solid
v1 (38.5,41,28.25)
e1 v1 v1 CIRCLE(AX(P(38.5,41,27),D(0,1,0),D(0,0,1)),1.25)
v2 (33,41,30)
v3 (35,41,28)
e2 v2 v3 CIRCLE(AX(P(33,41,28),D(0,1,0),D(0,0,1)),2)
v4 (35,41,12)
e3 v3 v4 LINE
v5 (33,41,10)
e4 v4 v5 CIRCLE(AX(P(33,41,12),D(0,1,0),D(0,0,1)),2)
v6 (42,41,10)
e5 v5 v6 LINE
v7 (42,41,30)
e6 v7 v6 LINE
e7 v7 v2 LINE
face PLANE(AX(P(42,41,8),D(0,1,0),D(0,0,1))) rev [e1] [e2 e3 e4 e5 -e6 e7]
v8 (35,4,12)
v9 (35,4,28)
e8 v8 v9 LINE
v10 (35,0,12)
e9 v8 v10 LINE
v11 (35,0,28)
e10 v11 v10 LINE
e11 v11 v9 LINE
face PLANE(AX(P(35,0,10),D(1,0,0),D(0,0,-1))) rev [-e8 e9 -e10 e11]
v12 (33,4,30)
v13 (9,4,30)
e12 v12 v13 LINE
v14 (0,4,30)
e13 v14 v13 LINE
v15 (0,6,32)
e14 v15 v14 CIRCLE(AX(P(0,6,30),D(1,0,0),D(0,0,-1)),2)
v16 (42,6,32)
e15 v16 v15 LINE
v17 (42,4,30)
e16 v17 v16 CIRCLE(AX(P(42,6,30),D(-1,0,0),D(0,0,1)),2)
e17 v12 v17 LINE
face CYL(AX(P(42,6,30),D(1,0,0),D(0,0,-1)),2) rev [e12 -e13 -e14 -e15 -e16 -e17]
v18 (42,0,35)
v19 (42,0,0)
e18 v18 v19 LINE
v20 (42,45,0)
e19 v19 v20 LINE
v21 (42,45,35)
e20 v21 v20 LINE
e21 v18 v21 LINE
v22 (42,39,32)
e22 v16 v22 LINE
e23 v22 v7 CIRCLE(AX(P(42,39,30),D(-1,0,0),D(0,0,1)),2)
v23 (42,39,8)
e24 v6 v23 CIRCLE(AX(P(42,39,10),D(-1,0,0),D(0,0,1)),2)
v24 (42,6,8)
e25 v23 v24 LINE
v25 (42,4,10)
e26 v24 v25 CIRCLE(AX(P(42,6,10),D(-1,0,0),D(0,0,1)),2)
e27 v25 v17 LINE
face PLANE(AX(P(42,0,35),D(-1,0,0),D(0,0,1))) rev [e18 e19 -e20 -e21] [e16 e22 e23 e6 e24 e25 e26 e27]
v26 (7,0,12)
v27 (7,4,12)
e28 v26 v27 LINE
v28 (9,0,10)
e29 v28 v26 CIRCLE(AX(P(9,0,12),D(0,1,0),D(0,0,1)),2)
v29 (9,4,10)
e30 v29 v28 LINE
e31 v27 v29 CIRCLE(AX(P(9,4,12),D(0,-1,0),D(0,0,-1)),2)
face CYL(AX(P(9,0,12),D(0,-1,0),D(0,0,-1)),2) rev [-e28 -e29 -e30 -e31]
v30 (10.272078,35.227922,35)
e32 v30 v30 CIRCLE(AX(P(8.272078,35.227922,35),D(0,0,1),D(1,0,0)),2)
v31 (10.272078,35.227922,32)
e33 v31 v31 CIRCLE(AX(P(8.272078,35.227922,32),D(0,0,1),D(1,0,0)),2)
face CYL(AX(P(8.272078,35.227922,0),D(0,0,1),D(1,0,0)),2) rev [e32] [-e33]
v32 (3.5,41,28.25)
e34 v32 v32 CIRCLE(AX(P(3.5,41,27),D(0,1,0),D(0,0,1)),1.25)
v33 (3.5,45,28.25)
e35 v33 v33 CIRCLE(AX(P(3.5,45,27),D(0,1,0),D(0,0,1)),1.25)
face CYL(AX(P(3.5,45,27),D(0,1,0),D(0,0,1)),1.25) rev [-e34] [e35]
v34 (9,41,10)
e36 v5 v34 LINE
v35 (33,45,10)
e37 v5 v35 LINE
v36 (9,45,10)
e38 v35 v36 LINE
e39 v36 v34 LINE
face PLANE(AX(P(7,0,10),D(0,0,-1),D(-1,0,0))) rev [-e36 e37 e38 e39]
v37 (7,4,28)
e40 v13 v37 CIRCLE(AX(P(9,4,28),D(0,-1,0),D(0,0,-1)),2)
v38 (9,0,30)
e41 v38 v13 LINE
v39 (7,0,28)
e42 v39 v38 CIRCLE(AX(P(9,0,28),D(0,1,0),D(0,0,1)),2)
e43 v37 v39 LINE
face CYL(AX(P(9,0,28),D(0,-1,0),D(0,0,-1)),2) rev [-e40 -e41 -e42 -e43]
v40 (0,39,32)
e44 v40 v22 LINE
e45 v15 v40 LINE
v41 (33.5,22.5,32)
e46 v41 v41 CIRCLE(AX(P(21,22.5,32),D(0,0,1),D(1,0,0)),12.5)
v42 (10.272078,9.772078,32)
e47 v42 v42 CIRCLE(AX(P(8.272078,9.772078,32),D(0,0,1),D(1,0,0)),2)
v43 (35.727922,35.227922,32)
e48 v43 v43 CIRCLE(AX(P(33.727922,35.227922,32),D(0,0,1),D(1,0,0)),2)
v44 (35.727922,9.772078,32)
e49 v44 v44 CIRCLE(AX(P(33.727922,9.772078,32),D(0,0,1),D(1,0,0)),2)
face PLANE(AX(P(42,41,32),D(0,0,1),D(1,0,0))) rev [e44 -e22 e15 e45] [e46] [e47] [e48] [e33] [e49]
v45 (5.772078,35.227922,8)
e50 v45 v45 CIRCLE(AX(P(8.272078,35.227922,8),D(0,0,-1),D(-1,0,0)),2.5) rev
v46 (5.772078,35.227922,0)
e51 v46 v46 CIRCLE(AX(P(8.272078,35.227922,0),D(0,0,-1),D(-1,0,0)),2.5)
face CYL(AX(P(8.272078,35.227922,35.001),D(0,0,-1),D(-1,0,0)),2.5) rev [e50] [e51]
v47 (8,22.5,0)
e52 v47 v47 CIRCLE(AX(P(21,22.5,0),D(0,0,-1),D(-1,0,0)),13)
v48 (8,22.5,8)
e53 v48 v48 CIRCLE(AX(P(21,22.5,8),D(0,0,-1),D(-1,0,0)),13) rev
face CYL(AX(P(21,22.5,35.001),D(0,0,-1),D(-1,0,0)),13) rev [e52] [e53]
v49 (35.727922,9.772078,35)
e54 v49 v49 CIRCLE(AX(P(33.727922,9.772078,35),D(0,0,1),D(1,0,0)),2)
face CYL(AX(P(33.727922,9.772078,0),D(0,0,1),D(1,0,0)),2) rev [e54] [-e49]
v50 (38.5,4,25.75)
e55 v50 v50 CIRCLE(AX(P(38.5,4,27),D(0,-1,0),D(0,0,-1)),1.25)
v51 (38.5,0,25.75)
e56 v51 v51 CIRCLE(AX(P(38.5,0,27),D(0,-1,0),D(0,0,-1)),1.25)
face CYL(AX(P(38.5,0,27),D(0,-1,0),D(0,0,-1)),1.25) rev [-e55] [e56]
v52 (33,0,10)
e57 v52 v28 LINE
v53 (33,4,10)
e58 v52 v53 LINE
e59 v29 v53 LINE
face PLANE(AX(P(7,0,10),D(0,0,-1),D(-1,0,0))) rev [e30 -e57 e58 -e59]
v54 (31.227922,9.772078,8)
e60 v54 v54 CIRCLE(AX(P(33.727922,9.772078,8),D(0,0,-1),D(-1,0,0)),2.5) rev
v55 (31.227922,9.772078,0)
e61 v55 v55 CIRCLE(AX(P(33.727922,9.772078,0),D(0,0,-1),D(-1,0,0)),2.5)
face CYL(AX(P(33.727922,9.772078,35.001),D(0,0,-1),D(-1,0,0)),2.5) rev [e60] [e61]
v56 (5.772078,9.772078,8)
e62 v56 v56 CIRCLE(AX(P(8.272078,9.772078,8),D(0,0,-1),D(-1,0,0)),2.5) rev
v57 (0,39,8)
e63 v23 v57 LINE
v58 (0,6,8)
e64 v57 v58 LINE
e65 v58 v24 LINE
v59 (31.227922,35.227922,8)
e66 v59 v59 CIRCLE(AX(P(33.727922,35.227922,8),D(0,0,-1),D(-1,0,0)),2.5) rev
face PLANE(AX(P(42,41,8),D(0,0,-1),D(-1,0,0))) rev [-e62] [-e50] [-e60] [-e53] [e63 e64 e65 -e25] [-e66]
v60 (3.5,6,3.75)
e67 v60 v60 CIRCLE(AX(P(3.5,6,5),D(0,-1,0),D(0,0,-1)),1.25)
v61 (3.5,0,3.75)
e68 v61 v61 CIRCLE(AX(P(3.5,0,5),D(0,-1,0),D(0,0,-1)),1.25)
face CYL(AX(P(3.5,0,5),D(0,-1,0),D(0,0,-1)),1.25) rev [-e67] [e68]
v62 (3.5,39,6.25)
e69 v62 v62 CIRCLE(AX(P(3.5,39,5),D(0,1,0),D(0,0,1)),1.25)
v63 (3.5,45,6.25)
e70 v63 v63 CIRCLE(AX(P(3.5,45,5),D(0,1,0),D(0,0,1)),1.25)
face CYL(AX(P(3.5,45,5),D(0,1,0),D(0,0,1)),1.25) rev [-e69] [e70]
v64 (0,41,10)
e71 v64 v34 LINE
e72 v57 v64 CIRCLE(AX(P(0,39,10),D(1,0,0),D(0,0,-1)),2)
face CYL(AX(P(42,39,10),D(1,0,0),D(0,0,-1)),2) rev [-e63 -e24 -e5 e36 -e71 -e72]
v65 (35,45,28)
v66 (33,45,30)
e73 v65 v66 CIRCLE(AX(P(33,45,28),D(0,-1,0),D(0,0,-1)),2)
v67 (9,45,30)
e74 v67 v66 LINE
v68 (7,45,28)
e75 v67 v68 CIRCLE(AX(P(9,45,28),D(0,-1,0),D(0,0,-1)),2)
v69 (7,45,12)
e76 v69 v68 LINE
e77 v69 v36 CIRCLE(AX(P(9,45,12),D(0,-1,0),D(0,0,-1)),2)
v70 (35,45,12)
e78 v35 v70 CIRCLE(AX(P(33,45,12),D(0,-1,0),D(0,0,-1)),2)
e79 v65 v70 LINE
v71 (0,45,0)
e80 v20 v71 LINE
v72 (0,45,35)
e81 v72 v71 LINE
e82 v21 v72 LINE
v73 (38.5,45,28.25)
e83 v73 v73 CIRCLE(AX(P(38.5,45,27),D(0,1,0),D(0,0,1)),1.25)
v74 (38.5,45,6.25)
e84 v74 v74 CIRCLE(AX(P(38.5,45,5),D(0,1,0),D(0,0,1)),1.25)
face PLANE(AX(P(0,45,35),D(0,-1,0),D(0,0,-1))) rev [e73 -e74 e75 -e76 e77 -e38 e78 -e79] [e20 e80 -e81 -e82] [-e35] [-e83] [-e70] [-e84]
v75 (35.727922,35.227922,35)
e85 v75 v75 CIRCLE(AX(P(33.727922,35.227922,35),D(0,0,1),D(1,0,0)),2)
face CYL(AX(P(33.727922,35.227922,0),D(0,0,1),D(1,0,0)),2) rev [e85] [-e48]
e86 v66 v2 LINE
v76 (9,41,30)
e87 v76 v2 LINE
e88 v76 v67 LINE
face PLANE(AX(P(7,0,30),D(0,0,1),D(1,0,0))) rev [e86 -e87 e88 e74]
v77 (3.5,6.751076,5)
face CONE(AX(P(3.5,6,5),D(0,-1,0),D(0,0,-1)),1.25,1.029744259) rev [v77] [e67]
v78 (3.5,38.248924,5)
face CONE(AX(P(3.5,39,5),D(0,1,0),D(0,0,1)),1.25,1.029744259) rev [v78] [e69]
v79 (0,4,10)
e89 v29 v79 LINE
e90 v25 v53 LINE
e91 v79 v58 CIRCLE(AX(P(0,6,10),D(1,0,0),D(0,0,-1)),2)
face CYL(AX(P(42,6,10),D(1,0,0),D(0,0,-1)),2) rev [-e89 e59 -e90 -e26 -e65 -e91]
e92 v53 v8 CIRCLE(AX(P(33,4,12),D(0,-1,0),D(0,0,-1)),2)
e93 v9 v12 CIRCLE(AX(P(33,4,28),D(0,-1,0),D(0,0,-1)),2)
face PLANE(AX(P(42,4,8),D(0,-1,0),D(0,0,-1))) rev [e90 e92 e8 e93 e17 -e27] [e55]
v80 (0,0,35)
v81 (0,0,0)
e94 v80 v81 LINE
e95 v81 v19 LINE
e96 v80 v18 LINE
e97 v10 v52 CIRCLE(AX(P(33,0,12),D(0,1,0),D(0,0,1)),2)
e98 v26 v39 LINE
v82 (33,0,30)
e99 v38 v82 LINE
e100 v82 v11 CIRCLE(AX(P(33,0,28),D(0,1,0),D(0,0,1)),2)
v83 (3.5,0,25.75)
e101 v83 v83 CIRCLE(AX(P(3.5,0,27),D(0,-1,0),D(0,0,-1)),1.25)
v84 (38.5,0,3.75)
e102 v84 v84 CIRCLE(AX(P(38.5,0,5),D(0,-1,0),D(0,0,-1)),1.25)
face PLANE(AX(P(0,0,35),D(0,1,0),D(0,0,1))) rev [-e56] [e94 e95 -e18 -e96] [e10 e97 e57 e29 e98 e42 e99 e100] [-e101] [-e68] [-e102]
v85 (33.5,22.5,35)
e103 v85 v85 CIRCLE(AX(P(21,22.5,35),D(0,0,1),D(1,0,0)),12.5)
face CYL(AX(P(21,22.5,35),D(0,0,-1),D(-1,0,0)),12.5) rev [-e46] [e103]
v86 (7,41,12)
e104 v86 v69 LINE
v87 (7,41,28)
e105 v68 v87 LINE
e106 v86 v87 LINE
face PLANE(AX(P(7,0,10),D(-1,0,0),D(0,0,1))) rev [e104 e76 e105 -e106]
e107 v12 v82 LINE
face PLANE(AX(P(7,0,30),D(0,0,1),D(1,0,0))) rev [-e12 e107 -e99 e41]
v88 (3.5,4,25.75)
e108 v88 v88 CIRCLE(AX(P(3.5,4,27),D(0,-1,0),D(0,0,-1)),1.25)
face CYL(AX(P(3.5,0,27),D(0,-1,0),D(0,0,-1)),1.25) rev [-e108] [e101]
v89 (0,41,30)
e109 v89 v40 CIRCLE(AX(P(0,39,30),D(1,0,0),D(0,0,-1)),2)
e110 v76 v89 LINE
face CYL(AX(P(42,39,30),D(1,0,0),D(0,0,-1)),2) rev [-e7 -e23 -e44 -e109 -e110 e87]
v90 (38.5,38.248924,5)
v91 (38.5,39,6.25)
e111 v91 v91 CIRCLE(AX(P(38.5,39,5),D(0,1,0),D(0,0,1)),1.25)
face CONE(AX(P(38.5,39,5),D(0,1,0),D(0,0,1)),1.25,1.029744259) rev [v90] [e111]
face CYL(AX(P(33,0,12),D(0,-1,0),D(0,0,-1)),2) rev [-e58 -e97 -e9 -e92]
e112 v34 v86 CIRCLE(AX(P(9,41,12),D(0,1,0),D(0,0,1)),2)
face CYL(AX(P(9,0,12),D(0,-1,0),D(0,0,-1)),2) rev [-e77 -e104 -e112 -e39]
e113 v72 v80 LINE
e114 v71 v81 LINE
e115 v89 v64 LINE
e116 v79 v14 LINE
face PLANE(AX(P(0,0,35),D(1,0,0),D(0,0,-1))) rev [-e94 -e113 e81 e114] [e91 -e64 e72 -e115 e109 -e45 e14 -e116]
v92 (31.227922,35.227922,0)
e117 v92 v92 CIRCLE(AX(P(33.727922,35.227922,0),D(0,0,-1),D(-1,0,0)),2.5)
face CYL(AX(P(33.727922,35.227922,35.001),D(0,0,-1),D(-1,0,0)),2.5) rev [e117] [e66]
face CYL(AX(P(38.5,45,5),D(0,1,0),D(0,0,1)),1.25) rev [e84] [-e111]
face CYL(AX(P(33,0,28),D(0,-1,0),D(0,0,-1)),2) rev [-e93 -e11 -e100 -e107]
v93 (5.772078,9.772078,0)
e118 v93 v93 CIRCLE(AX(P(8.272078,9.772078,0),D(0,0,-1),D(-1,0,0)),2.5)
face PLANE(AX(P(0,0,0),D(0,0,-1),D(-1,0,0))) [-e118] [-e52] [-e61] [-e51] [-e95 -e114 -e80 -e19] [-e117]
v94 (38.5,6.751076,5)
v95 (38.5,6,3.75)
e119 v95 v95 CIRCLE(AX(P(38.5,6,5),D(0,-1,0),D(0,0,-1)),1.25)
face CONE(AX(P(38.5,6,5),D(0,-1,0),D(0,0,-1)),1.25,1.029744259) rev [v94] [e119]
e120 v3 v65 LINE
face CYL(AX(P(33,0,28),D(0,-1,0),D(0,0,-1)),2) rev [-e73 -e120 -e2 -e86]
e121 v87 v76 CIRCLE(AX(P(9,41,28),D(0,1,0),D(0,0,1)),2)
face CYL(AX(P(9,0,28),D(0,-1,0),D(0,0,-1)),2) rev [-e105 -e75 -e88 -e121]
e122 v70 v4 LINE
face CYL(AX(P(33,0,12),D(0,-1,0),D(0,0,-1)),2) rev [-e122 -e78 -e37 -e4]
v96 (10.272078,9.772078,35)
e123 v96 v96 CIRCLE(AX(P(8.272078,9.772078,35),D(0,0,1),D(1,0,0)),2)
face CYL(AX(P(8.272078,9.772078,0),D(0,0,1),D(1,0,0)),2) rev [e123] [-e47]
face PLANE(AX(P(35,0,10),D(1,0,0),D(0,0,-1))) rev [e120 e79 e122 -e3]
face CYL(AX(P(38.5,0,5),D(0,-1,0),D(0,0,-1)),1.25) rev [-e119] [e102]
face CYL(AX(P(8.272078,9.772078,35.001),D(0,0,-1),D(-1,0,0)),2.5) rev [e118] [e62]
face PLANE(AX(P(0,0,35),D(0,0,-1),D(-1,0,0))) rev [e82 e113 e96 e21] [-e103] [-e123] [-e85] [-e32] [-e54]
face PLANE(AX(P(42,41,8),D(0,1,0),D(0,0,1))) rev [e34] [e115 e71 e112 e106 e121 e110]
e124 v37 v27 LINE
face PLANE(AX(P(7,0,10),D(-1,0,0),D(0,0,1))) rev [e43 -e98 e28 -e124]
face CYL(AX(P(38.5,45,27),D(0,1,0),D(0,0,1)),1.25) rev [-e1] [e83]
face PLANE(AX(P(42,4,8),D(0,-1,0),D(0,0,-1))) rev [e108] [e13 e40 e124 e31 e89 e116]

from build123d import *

# Parameters (mm, degrees)
SKETCH_1_W             = 42
SKETCH_1_H             = 45
SKETCH_1_R             = 12.5
EXTRUDE_1_DEPTH        = 35
SKETCH_3_W             = 24
SKETCH_3_H             = 37
CUT_EXTRUDE_1_DEPTH    = 71.809603868
HOLE_WIZARD_M3_2_D     = 2.5
HOLE_WIZARD_M3_2_DEPTH = 6
HOLE_WIZARD_M3_2_TIP   = 0.751075774
HOLE_WIZARD_M3_4_D     = 2.5
HOLE_WIZARD_M3_4_DEPTH = 6
HOLE_WIZARD_M3_4_TIP   = 0.751075774
SKETCH_18_W            = 28
SKETCH_18_H            = 20
CUT_EXTRUDE_8_DEPTH    = 71.809603868
SKETCH_13_R            = 2
CUT_EXTRUDE_10_DEPTH   = 71.809603868
FILLET_3_DEPTH         = 42
FILLET_7_R             = 2
CUT_EXTRUDE_9_REACH    = 72.81
SKETCH_12_R            = 13
SKETCH_12_R_2          = 12.5
SKETCH_12_R_3          = 2.5


with BuildPart() as part:
    # 草图1 → 凸台-拉伸1 (new body)
    with BuildSketch(Plane.XY):
        with Locations((21, 22.5)):
            Rectangle(SKETCH_1_W, SKETCH_1_H)
        with Locations((21, 22.5)):
            Circle(SKETCH_1_R, mode=Mode.SUBTRACT)
    extrude(amount=EXTRUDE_1_DEPTH)

    # 草图3 → 切除-拉伸1 (cut, through all)
    with BuildSketch(Plane.ZY):
        with Locations((20, 22.5)):
            Rectangle(SKETCH_3_W, SKETCH_3_H)
    extrude(amount=-CUT_EXTRUDE_1_DEPTH, mode=Mode.SUBTRACT)

    # M3 螺纹孔2
    with Locations(Plane(origin=(3.5, 45, 5), x_dir=(0, 0, 1), z_dir=(0, 1, 0))):
        with Locations((0, 0), (0, 35), (22, 35), (22, 0)):
            Hole(HOLE_WIZARD_M3_2_D / 2, depth=HOLE_WIZARD_M3_2_DEPTH)
            with Locations((0, 0, -(HOLE_WIZARD_M3_2_DEPTH + HOLE_WIZARD_M3_2_TIP / 2))):  # 118° drill point
                Cone(0, HOLE_WIZARD_M3_2_D / 2, HOLE_WIZARD_M3_2_TIP, mode=Mode.SUBTRACT)

    # M3 螺纹孔4
    with Locations(Plane(origin=(3.5, 0, 5), x_dir=(0, 0, -1), z_dir=(0, -1, 0))):
        with Locations((0, 0), (-22, 0), (-22, 35), (0, 35)):
            Hole(HOLE_WIZARD_M3_4_D / 2, depth=HOLE_WIZARD_M3_4_DEPTH)
            with Locations((0, 0, -(HOLE_WIZARD_M3_4_DEPTH + HOLE_WIZARD_M3_4_TIP / 2))):  # 118° drill point
                Cone(0, HOLE_WIZARD_M3_4_D / 2, HOLE_WIZARD_M3_4_TIP, mode=Mode.SUBTRACT)

    # 草图18 → 切除-拉伸8 (cut, through all)
    with BuildSketch(Plane(origin=(0, 45, 0), x_dir=(1, 0, 0), z_dir=(0, 1, 0))):
        with Locations((21, -20)):
            Rectangle(SKETCH_18_W, SKETCH_18_H)
    extrude(amount=-CUT_EXTRUDE_8_DEPTH, mode=Mode.SUBTRACT)

    # 草图13 → 切除-拉伸10 (cut, through all)
    with BuildSketch(Plane.XY.offset(35)):
        with Locations((33.727922061, 9.772077939)):
            Circle(SKETCH_13_R)
        with Locations((33.727922061, 35.227922061)):
            Circle(SKETCH_13_R)
        with Locations((8.272077939, 35.227922061)):
            Circle(SKETCH_13_R)
        with Locations((8.272077939, 9.772077939)):
            Circle(SKETCH_13_R)
    extrude(amount=-CUT_EXTRUDE_10_DEPTH, mode=Mode.SUBTRACT)

    # 圆角3: read off the stored shape, not the designer's step
    # 圆角3 outline → 圆角3 (add)
    with BuildSketch(Plane.YZ):
        with BuildLine():
            ThreePointArc((41, 10), (40.414213562, 8.585786438), (39, 8))
            Line((39, 8), (41, 8))
            Line((41, 8), (41, 10))
        make_face()
        with BuildLine():
            Line((4, 8), (6, 8))
            ThreePointArc((6, 8), (4.585786438, 8.585786438), (4, 10))
            Line((4, 10), (4, 8))
        make_face()
        with BuildLine():
            ThreePointArc((39, 32), (40.414213562, 31.414213562), (41, 30))
            Line((41, 30), (41, 32))
            Line((41, 32), (39, 32))
        make_face()
        with BuildLine():
            Line((4, 32), (4, 30))
            ThreePointArc((4, 30), (4.585786438, 31.414213562), (6, 32))
            Line((6, 32), (4, 32))
        make_face()
    extrude(amount=FILLET_3_DEPTH)

    # 圆角7
    fillet_7_edges = [part.edges().sort_by_distance(p)[0] for p in [
        (35, 2, 10),
        (35, 43, 10),
        (35, 2, 30),
        (35, 43, 30),
        (7, 2, 30),
        (7, 43, 30),
        (7, 2, 10),
        (7, 43, 10),
    ]]
    fillet(fillet_7_edges, radius=FILLET_7_R)

    # 草图12 → 切除-拉伸9 (cut, up to next)
    with BuildSketch(Plane(origin=(0, 0, 0), x_dir=(-1, 0, 0), z_dir=(0, 0, -1)), mode=Mode.PRIVATE) as cut_extrude_9_sk1:
        with Locations((-21, 22.5)):
            Circle(SKETCH_12_R)
        with Locations(Location((-21, 22.5, 0), (0, 0, 180))):
            Circle(SKETCH_12_R_2, mode=Mode.SUBTRACT)
    cut_extrude_9_tool1 = extrude(cut_extrude_9_sk1.sketch, amount=-CUT_EXTRUDE_9_REACH, mode=Mode.PRIVATE) & part.part
    # 草图12 → 切除-拉伸9 (cut, up to next)
    with BuildSketch(Plane(origin=(0, 0, 0), x_dir=(-1, 0, 0), z_dir=(0, 0, -1)), mode=Mode.PRIVATE) as cut_extrude_9_sk2:
        with Locations((-8.272077939, 35.227922061)):
            Circle(SKETCH_12_R_3)
    cut_extrude_9_tool2 = extrude(cut_extrude_9_sk2.sketch, amount=-CUT_EXTRUDE_9_REACH, mode=Mode.PRIVATE) & part.part
    # 草图12 → 切除-拉伸9 (cut, up to next)
    with BuildSketch(Plane(origin=(0, 0, 0), x_dir=(-1, 0, 0), z_dir=(0, 0, -1)), mode=Mode.PRIVATE) as cut_extrude_9_sk3:
        with Locations((-8.272077939, 9.772077939)):
            Circle(SKETCH_12_R_3)
    cut_extrude_9_tool3 = extrude(cut_extrude_9_sk3.sketch, amount=-CUT_EXTRUDE_9_REACH, mode=Mode.PRIVATE) & part.part
    # 草图12 → 切除-拉伸9 (cut, up to next)
    with BuildSketch(Plane(origin=(0, 0, 0), x_dir=(-1, 0, 0), z_dir=(0, 0, -1)), mode=Mode.PRIVATE) as cut_extrude_9_sk4:
        with Locations((-33.727922061, 9.772077939)):
            Circle(SKETCH_12_R_3)
    cut_extrude_9_tool4 = extrude(cut_extrude_9_sk4.sketch, amount=-CUT_EXTRUDE_9_REACH, mode=Mode.PRIVATE) & part.part
    # 草图12 → 切除-拉伸9 (cut, up to next)
    with BuildSketch(Plane(origin=(0, 0, 0), x_dir=(-1, 0, 0), z_dir=(0, 0, -1)), mode=Mode.PRIVATE) as cut_extrude_9_sk5:
        with Locations((-33.727922061, 35.227922061)):
            Circle(SKETCH_12_R_3)
    cut_extrude_9_tool5 = extrude(cut_extrude_9_sk5.sketch, amount=-CUT_EXTRUDE_9_REACH, mode=Mode.PRIVATE) & part.part
    add(cut_extrude_9_tool1.solids().sort_by_distance((33.632304, 22.5, 0))[0], mode=Mode.SUBTRACT)
    add(cut_extrude_9_tool2.solids().sort_by_distance((8.272078, 35.227922, 0))[0], mode=Mode.SUBTRACT)
    add(cut_extrude_9_tool3.solids().sort_by_distance((8.272078, 9.772078, 0))[0], mode=Mode.SUBTRACT)
    add(cut_extrude_9_tool4.solids().sort_by_distance((33.727922, 9.772078, 0))[0], mode=Mode.SUBTRACT)
    add(cut_extrude_9_tool5.solids().sort_by_distance((33.727922, 35.227922, 0))[0], mode=Mode.SUBTRACT)


solid = part.part
